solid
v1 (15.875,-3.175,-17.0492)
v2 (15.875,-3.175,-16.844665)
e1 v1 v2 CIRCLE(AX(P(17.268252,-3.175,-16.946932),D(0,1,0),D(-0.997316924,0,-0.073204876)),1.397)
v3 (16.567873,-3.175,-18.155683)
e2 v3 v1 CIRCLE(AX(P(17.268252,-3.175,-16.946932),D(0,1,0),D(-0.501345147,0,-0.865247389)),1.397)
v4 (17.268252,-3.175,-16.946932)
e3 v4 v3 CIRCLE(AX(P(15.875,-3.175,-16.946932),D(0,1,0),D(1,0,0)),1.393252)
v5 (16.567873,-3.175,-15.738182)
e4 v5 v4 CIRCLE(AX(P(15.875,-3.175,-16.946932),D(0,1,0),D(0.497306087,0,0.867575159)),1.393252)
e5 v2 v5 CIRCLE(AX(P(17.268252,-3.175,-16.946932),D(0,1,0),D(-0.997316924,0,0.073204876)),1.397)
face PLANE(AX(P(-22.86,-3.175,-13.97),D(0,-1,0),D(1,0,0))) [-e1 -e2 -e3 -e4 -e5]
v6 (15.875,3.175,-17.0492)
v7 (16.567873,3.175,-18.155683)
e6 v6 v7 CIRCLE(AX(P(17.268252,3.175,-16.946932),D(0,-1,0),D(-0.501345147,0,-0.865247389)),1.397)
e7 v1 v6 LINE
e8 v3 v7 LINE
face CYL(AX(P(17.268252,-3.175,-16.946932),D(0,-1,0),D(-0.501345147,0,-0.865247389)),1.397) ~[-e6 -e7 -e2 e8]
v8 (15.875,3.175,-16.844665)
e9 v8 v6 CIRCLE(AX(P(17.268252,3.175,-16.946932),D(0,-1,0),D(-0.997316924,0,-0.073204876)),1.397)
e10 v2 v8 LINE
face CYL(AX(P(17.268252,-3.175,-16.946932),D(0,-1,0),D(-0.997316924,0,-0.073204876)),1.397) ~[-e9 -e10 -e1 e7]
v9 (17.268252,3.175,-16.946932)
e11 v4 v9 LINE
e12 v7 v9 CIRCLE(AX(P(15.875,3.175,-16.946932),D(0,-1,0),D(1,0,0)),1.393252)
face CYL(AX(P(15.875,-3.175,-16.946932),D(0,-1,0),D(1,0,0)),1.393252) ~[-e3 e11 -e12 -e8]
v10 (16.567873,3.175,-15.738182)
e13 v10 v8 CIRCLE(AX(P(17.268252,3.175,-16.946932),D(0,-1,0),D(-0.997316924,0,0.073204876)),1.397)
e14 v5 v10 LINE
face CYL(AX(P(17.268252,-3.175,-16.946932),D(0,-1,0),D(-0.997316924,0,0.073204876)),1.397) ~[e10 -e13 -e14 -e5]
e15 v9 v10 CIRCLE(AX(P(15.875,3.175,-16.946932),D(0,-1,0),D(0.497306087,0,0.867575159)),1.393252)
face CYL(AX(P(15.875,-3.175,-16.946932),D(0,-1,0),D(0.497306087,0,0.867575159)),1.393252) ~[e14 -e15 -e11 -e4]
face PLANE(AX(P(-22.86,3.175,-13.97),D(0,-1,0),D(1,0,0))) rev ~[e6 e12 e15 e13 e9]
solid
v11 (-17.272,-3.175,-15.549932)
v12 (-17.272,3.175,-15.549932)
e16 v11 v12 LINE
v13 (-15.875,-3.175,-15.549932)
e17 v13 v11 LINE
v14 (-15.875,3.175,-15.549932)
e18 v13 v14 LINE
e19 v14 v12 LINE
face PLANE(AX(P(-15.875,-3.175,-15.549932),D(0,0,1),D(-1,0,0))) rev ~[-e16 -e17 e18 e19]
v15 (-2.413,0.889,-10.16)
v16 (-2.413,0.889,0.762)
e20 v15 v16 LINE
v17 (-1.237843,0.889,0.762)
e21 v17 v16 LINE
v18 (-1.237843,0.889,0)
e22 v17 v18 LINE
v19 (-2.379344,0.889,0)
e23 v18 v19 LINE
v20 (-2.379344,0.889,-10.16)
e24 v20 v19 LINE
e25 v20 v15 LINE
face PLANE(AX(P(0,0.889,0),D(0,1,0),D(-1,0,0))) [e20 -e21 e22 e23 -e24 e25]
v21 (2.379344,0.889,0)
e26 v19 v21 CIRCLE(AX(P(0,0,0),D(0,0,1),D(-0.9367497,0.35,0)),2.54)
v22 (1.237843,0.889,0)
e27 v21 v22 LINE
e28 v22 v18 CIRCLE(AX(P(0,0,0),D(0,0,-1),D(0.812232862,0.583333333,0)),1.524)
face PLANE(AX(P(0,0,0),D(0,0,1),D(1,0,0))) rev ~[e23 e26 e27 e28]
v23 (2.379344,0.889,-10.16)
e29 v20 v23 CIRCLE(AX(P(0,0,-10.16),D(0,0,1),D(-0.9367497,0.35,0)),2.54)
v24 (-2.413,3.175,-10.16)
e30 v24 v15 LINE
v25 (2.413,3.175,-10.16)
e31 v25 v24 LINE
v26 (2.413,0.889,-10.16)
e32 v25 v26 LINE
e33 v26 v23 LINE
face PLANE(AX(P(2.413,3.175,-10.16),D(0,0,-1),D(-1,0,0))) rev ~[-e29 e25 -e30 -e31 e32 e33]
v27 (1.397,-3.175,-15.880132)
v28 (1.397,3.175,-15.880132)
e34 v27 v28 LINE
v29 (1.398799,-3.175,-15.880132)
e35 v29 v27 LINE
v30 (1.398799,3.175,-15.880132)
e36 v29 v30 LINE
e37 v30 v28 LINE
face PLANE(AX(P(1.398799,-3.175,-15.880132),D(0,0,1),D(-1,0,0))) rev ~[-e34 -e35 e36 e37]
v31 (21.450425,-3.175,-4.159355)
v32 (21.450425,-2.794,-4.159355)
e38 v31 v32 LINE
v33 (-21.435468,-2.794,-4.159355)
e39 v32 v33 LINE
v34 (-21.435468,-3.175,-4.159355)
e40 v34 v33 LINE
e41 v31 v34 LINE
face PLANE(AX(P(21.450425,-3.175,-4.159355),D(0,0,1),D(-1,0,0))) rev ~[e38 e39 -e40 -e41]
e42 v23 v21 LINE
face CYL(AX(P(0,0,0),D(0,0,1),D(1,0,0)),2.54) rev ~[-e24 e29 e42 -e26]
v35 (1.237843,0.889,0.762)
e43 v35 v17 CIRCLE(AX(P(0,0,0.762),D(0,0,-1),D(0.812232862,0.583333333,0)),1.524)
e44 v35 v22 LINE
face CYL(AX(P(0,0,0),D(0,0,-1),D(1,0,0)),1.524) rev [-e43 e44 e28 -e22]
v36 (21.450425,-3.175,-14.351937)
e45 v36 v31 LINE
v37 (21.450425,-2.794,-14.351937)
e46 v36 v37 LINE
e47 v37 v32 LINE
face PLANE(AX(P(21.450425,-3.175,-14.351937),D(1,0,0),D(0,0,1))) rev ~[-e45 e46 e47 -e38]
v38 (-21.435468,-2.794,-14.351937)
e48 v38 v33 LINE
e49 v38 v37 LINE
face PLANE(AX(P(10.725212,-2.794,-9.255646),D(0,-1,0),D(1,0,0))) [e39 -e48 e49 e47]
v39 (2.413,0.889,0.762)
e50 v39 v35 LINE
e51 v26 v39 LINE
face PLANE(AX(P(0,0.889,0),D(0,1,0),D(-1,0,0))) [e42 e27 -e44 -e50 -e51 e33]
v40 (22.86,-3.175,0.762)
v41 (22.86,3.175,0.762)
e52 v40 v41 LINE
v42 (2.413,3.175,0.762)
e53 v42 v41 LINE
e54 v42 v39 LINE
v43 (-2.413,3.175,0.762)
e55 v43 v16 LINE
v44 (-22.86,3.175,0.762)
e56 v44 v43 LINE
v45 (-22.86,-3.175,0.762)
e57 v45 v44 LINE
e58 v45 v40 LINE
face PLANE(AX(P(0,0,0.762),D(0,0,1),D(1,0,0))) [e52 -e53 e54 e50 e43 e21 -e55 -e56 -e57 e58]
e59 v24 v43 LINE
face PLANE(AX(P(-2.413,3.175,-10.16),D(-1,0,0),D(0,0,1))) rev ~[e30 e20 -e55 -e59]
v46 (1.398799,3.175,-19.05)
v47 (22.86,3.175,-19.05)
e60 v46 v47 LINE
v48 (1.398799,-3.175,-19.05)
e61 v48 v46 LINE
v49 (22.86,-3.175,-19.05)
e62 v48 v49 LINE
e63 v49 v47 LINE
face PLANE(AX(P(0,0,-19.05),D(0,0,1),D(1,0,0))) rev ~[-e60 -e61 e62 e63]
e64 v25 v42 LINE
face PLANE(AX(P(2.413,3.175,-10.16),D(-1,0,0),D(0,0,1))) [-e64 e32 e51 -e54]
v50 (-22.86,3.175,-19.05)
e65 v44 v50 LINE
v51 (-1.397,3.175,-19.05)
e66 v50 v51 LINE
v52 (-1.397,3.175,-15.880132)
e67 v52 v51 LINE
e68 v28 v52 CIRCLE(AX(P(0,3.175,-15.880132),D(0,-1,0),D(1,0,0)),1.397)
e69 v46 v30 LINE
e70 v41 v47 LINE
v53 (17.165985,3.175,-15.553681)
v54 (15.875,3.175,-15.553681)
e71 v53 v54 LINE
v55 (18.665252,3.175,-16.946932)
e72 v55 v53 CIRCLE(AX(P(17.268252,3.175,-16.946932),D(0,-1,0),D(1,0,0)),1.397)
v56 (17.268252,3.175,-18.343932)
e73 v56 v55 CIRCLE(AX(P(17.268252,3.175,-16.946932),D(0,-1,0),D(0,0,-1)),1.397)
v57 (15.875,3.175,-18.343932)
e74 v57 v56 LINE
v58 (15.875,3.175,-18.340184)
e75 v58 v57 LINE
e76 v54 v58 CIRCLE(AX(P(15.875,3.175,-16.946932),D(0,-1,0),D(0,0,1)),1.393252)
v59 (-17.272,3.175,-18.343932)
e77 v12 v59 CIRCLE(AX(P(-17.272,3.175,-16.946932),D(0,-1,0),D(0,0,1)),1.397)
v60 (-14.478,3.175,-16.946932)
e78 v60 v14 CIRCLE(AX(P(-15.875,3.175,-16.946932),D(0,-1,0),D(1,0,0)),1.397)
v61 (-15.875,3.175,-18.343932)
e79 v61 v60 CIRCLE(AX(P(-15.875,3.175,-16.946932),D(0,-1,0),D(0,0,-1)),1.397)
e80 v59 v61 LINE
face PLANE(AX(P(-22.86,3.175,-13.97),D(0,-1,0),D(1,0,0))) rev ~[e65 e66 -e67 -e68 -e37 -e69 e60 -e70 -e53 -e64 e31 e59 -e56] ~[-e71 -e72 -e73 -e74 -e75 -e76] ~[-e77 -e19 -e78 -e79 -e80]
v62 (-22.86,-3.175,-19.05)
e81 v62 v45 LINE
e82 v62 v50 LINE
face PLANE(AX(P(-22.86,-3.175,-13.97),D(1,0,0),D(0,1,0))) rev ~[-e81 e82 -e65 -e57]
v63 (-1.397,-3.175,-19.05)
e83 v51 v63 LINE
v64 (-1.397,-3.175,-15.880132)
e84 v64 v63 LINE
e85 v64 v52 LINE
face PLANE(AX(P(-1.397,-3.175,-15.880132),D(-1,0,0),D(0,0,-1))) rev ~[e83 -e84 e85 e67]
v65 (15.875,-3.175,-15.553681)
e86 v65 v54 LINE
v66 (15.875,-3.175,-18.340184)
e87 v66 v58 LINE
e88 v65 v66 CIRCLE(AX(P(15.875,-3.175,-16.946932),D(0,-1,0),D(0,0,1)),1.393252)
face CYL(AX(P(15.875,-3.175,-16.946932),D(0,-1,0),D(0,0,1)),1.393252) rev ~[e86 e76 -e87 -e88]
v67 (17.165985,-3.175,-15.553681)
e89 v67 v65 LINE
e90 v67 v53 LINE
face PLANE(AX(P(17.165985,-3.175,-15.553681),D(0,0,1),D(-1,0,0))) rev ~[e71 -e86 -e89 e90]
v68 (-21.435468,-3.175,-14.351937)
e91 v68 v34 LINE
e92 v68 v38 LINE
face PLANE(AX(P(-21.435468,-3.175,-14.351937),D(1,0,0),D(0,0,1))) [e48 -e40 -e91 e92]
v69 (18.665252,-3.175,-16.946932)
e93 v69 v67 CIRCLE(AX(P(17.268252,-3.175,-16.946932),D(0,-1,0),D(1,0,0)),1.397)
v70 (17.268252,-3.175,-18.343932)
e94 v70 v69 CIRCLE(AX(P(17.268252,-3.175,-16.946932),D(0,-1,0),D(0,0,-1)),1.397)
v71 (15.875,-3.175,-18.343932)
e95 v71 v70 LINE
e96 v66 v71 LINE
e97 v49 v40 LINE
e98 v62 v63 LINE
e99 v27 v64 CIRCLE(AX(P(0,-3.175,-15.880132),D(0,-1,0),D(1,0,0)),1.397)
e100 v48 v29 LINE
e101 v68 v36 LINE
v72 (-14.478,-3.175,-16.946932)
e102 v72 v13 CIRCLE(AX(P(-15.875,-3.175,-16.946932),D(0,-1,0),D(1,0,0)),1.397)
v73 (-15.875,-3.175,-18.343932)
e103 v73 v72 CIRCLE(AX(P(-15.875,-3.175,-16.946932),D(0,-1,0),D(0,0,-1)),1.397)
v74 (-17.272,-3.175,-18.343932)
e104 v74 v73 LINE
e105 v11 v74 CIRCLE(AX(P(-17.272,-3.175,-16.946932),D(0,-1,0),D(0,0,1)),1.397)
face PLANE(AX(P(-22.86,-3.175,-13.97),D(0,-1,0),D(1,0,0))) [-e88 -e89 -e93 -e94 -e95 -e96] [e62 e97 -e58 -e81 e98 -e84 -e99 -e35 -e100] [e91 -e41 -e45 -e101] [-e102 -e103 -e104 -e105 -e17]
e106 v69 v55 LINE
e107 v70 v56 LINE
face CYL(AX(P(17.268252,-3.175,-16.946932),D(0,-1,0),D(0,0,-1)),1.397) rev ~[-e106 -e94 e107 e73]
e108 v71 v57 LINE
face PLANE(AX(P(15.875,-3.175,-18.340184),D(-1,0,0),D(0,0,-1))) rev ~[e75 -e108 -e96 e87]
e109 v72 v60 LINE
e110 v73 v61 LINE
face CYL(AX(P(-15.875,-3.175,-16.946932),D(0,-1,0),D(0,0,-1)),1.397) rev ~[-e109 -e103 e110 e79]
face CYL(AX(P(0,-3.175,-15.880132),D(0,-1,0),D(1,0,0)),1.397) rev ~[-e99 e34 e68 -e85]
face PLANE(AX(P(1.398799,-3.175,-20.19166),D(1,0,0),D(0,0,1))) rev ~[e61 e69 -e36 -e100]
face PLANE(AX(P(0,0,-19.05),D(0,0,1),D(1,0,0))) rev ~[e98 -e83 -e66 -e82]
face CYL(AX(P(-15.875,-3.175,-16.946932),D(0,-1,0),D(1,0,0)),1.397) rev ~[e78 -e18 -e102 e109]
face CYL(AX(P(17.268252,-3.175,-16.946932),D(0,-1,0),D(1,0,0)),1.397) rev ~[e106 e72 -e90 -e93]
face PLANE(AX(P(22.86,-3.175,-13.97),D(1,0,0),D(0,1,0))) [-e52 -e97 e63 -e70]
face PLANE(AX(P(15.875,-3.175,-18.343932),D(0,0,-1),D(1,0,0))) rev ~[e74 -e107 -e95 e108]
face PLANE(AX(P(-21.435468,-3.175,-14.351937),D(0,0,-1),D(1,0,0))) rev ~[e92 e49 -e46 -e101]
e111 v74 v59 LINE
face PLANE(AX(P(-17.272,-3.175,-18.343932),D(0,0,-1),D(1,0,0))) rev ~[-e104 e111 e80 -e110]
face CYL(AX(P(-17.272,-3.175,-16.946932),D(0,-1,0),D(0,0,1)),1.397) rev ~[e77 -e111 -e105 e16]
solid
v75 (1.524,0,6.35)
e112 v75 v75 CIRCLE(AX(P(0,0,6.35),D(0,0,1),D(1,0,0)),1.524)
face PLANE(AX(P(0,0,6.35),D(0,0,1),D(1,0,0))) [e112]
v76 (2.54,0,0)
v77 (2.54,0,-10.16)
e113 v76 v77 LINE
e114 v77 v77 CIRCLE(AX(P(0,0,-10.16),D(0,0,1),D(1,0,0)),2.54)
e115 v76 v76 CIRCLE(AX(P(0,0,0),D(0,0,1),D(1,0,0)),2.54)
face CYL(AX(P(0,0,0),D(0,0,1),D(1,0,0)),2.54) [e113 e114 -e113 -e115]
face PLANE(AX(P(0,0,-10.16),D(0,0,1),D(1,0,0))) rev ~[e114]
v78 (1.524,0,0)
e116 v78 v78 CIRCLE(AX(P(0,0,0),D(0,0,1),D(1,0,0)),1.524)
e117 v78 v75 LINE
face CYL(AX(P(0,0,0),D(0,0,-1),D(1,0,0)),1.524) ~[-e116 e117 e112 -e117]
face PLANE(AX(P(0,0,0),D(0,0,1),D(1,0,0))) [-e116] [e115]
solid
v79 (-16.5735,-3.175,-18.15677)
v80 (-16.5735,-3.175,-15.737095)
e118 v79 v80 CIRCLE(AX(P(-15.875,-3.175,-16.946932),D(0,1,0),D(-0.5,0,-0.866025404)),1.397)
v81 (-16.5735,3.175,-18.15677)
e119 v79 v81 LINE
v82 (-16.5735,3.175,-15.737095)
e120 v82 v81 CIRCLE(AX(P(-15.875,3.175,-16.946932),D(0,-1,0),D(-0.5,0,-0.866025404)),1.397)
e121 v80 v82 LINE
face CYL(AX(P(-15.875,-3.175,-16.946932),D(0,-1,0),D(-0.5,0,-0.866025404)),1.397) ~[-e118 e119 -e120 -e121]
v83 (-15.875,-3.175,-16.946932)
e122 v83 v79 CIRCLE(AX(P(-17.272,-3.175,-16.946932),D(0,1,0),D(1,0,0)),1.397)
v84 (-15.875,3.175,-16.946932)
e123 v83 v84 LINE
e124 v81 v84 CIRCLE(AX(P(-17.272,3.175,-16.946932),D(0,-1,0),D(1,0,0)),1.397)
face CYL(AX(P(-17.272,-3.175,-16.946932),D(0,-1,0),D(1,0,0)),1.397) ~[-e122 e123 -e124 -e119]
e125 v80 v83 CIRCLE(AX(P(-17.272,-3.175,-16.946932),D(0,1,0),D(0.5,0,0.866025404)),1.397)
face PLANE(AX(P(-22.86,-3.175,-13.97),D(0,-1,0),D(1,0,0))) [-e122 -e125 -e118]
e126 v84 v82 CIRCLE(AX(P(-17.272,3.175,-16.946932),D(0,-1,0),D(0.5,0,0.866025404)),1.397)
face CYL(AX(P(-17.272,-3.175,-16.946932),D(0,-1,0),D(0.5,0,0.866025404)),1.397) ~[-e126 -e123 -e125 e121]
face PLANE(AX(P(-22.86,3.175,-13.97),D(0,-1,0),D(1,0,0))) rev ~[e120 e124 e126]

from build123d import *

# Parameters (mm, degrees)
F0_R      = 1.524
F2_DEPTH  = 6.35
F1_R      = 2.54
F3_DEPTH  = 10.16
F4_W      = 45.72
F4_H      = 6.35
F5_DEPTH  = 13.97
F6_DEPTH  = 0.762
F7_DEPTH  = 10.16
F8_DEPTH  = 1.27
F9_DEPTH  = 5.08
F11_DEPTH = 25.4
F12_W     = 21.4504245669
F12_H     = 10.1925823838
F12_W_2   = 21.4354675263
F13_DEPTH = 0.381
F14_W     = 4.826
F14_H     = 20.32
F15_DEPTH = 2.286


with BuildPart() as f2:
    # F0 (on Top) → F2 (new body)
    with BuildSketch(Plane.XY):
        Circle(F0_R)
    extrude(amount=F2_DEPTH)

    # F1 (on Top) → F3 (join)
    with BuildSketch(Plane.XY):
        Circle(F1_R)
    extrude(amount=-F3_DEPTH)


with BuildPart() as f5:
    # F4 (on Top) → F5 (new body)
    with BuildSketch(Plane.XY):
        Rectangle(F4_W, F4_H)
    extrude(amount=-F5_DEPTH)

    # F6 (add): a face of the model
    f6_faces = [f5.faces().sort_by_distance(p)[0] for p in [
        (0, 0, 0),
    ]]
    extrude(f6_faces, amount=F6_DEPTH)

    # F1 (on Top) → F7 (cut)
    with BuildSketch(Plane.XY):
        Circle(F1_R)
    extrude(amount=-F7_DEPTH, mode=Mode.SUBTRACT)

    # F0 (on Top) → F8 (cut)
    with BuildSketch(Plane.XY):
        Circle(F0_R)
    extrude(amount=F8_DEPTH, mode=Mode.SUBTRACT)

    # F9 (add): a face of the model
    f9_faces = [f5.faces().sort_by_distance(p)[0] for p in [
        (0, 0, -13.97),
    ]]
    extrude(f9_faces, amount=F9_DEPTH)

    # F10 (on face) → F11 (cut)
    with BuildSketch(Plane.XZ.offset(3.175)):
        with BuildLine():
            ThreePointArc((-15.875, -18.3439323009), (-14.8871718267, -17.9347604742), (-14.478, -16.9469323009))
            ThreePointArc((-14.478, -16.9469323009), (-14.8871718267, -15.9591041276), (-15.875, -15.5499323009))
            ThreePointArc((-15.875, -15.5499323009), (-16.236570206, -15.5975339216), (-16.5735, -15.7370948118))
            ThreePointArc((-16.5735, -15.7370948118), (-16.0621625109, -16.2484323009), (-15.875, -16.9469323009))
            ThreePointArc((-15.875, -16.9469323009), (-16.0621625109, -17.6454323009), (-16.5735, -18.15676979))
            ThreePointArc((-16.5735, -18.15676979), (-16.236570206, -18.2963306803), (-15.875, -18.3439323009))
        make_face()
        with BuildLine():
            ThreePointArc((-16.5735, -15.7370948118), (-16.236570206, -15.5975339216), (-15.875, -15.5499323009))
            Line((-15.875, -15.5499323009), (-17.272, -15.5499323009))
            ThreePointArc((-17.272, -15.5499323009), (-16.910429794, -15.5975339216), (-16.5735, -15.7370948118))
        make_face()
        with BuildLine():
            Line((-17.272, -18.3439323009), (-15.875, -18.3439323009))
            ThreePointArc((-15.875, -18.3439323009), (-16.236570206, -18.2963306803), (-16.5735, -18.15676979))
            ThreePointArc((-16.5735, -18.15676979), (-16.910429794, -18.2963306803), (-17.272, -18.3439323009))
        make_face()
        with BuildLine():
            ThreePointArc((-16.5735, -18.15676979), (-17.272, -16.9469323009), (-16.5735, -15.7370948118))
            ThreePointArc((-16.5735, -15.7370948118), (-16.910429794, -15.5975339216), (-17.272, -15.5499323009))
            ThreePointArc((-17.272, -15.5499323009), (-18.669, -16.9469323009), (-17.272, -18.3439323009))
            ThreePointArc((-17.272, -18.3439323009), (-16.910429794, -18.2963306803), (-16.5735, -18.15676979))
        make_face()
        with BuildLine():
            Line((17.2682517423, -18.3439323009), (17.2682517423, -16.9469323009))
            ThreePointArc((17.2682517423, -16.9469323009), (17.0805074315, -17.6454323009), (16.5678725715, -18.1556829026))
            ThreePointArc((16.5678725715, -18.1556829026), (16.9056332035, -18.2960493438), (17.2682517423, -18.3439323009))
        make_face()
        with BuildLine():
            ThreePointArc((16.5678725715, -15.7381816992), (17.0805074315, -16.2484323009), (17.2682517423, -16.9469323009))
            Line((17.2682517423, -16.9469323009), (17.2682517423, -15.5536805586))
            Line((17.2682517423, -15.5536805586), (17.1659845309, -15.5536805586))
            ThreePointArc((17.1659845309, -15.5536805586), (16.8564623891, -15.6120021422), (16.5678725715, -15.7381816992))
        make_face()
        with BuildLine():
            Line((17.2682517423, -15.5536805586), (17.2682517423, -16.9469323009))
            Line((17.2682517423, -16.9469323009), (17.2682517423, -18.3439323009))
            ThreePointArc((17.2682517423, -18.3439323009), (18.2560799156, -17.9347604742), (18.6652517423, -16.9469323009))
            ThreePointArc((18.6652517423, -16.9469323009), (18.2192358919, -15.9235857579), (17.1659845309, -15.5536805586))
            Line((17.1659845309, -15.5536805586), (17.2682517423, -15.5536805586))
        make_face()
        with BuildLine():
            ThreePointArc((15.875, -16.8446650895), (16.0842335949, -16.205507978), (16.5678725715, -15.7381816992))
            ThreePointArc((16.5678725715, -15.7381816992), (16.2335083929, -15.6005957347), (15.875, -15.5536805586))
            Line((15.875, -15.5536805586), (15.875, -16.8446650895))
        make_face()
        with BuildLine():
            ThreePointArc((15.875, -15.5536805586), (16.2335083929, -15.6005957347), (16.5678725715, -15.7381816992))
            ThreePointArc((16.5678725715, -15.7381816992), (16.8564623891, -15.6120021422), (17.1659845309, -15.5536805586))
            Line((17.1659845309, -15.5536805586), (15.875, -15.5536805586))
        make_face()
        with BuildLine():
            ThreePointArc((17.2682517423, -18.3439323009), (16.9056332035, -18.2960493438), (16.5678725715, -18.1556829026))
            ThreePointArc((16.5678725715, -18.1556829026), (16.2335083929, -18.2932688672), (15.875, -18.3401840432))
            Line((15.875, -18.3401840432), (15.875, -18.3439323009))
            Line((15.875, -18.3439323009), (17.2682517423, -18.3439323009))
        make_face()
        with BuildLine():
            ThreePointArc((15.875, -18.3401840432), (16.2335083929, -18.2932688672), (16.5678725715, -18.1556829026))
            ThreePointArc((16.5678725715, -18.1556829026), (16.0842335949, -17.6883566239), (15.875, -17.0491995123))
            Line((15.875, -17.0491995123), (15.875, -18.3401840432))
        make_face()
        with BuildLine():
            Line((15.875, -16.8446650895), (15.875, -15.5536805586))
            ThreePointArc((15.875, -15.5536805586), (14.4817482577, -16.9469323009), (15.875, -18.3401840432))
            Line((15.875, -18.3401840432), (15.875, -17.0491995123))
            ThreePointArc((15.875, -17.0491995123), (15.8712517423, -16.9469323009), (15.875, -16.8446650895))
        make_face()
        with BuildLine():
            Line((-1.397, -15.8801323009), (1.397, -15.8801323009))
            ThreePointArc((1.397, -15.8801323009), (0, -14.4831323009), (-1.397, -15.8801323009))
        make_face()
        with BuildLine():
            Line((1.3987992425, -15.8801323009), (1.397, -15.8801323009))
            ThreePointArc((1.397, -15.8801323009), (0, -17.2771323009), (-1.397, -15.8801323009))
            Line((-1.397, -15.8801323009), (-1.397, -20.1916601509))
            Line((-1.397, -20.1916601509), (1.3987992425, -20.1916601509))
            Line((1.3987992425, -20.1916601509), (1.3987992425, -15.8801323009))
        make_face()
        with BuildLine():
            ThreePointArc((-1.397, -15.8801323009), (0, -17.2771323009), (1.397, -15.8801323009))
            Line((1.397, -15.8801323009), (-1.397, -15.8801323009))
        make_face()
    extrude(amount=-F11_DEPTH, mode=Mode.SUBTRACT)

    # F12 (on face) → F13 (cut)
    with BuildSketch(Plane.XZ.offset(3.175)):
        with Locations((10.7252122834, -9.2556457967)):
            Rectangle(F12_W, F12_H)
        with Locations((-10.7177337632, -9.2556457967)):
            Rectangle(F12_W_2, F12_H)
    extrude(amount=-F13_DEPTH, mode=Mode.SUBTRACT)

    # F14 (on face) → F15 (cut)
    with BuildSketch(Plane(origin=(0, 3.175, 0), x_dir=(-1, 0, 0), z_dir=(0, 1, 0))):
        Rectangle(F14_W, F14_H)
    extrude(amount=-F15_DEPTH, mode=Mode.SUBTRACT)


solid = Compound([f2.part, f5.part])
